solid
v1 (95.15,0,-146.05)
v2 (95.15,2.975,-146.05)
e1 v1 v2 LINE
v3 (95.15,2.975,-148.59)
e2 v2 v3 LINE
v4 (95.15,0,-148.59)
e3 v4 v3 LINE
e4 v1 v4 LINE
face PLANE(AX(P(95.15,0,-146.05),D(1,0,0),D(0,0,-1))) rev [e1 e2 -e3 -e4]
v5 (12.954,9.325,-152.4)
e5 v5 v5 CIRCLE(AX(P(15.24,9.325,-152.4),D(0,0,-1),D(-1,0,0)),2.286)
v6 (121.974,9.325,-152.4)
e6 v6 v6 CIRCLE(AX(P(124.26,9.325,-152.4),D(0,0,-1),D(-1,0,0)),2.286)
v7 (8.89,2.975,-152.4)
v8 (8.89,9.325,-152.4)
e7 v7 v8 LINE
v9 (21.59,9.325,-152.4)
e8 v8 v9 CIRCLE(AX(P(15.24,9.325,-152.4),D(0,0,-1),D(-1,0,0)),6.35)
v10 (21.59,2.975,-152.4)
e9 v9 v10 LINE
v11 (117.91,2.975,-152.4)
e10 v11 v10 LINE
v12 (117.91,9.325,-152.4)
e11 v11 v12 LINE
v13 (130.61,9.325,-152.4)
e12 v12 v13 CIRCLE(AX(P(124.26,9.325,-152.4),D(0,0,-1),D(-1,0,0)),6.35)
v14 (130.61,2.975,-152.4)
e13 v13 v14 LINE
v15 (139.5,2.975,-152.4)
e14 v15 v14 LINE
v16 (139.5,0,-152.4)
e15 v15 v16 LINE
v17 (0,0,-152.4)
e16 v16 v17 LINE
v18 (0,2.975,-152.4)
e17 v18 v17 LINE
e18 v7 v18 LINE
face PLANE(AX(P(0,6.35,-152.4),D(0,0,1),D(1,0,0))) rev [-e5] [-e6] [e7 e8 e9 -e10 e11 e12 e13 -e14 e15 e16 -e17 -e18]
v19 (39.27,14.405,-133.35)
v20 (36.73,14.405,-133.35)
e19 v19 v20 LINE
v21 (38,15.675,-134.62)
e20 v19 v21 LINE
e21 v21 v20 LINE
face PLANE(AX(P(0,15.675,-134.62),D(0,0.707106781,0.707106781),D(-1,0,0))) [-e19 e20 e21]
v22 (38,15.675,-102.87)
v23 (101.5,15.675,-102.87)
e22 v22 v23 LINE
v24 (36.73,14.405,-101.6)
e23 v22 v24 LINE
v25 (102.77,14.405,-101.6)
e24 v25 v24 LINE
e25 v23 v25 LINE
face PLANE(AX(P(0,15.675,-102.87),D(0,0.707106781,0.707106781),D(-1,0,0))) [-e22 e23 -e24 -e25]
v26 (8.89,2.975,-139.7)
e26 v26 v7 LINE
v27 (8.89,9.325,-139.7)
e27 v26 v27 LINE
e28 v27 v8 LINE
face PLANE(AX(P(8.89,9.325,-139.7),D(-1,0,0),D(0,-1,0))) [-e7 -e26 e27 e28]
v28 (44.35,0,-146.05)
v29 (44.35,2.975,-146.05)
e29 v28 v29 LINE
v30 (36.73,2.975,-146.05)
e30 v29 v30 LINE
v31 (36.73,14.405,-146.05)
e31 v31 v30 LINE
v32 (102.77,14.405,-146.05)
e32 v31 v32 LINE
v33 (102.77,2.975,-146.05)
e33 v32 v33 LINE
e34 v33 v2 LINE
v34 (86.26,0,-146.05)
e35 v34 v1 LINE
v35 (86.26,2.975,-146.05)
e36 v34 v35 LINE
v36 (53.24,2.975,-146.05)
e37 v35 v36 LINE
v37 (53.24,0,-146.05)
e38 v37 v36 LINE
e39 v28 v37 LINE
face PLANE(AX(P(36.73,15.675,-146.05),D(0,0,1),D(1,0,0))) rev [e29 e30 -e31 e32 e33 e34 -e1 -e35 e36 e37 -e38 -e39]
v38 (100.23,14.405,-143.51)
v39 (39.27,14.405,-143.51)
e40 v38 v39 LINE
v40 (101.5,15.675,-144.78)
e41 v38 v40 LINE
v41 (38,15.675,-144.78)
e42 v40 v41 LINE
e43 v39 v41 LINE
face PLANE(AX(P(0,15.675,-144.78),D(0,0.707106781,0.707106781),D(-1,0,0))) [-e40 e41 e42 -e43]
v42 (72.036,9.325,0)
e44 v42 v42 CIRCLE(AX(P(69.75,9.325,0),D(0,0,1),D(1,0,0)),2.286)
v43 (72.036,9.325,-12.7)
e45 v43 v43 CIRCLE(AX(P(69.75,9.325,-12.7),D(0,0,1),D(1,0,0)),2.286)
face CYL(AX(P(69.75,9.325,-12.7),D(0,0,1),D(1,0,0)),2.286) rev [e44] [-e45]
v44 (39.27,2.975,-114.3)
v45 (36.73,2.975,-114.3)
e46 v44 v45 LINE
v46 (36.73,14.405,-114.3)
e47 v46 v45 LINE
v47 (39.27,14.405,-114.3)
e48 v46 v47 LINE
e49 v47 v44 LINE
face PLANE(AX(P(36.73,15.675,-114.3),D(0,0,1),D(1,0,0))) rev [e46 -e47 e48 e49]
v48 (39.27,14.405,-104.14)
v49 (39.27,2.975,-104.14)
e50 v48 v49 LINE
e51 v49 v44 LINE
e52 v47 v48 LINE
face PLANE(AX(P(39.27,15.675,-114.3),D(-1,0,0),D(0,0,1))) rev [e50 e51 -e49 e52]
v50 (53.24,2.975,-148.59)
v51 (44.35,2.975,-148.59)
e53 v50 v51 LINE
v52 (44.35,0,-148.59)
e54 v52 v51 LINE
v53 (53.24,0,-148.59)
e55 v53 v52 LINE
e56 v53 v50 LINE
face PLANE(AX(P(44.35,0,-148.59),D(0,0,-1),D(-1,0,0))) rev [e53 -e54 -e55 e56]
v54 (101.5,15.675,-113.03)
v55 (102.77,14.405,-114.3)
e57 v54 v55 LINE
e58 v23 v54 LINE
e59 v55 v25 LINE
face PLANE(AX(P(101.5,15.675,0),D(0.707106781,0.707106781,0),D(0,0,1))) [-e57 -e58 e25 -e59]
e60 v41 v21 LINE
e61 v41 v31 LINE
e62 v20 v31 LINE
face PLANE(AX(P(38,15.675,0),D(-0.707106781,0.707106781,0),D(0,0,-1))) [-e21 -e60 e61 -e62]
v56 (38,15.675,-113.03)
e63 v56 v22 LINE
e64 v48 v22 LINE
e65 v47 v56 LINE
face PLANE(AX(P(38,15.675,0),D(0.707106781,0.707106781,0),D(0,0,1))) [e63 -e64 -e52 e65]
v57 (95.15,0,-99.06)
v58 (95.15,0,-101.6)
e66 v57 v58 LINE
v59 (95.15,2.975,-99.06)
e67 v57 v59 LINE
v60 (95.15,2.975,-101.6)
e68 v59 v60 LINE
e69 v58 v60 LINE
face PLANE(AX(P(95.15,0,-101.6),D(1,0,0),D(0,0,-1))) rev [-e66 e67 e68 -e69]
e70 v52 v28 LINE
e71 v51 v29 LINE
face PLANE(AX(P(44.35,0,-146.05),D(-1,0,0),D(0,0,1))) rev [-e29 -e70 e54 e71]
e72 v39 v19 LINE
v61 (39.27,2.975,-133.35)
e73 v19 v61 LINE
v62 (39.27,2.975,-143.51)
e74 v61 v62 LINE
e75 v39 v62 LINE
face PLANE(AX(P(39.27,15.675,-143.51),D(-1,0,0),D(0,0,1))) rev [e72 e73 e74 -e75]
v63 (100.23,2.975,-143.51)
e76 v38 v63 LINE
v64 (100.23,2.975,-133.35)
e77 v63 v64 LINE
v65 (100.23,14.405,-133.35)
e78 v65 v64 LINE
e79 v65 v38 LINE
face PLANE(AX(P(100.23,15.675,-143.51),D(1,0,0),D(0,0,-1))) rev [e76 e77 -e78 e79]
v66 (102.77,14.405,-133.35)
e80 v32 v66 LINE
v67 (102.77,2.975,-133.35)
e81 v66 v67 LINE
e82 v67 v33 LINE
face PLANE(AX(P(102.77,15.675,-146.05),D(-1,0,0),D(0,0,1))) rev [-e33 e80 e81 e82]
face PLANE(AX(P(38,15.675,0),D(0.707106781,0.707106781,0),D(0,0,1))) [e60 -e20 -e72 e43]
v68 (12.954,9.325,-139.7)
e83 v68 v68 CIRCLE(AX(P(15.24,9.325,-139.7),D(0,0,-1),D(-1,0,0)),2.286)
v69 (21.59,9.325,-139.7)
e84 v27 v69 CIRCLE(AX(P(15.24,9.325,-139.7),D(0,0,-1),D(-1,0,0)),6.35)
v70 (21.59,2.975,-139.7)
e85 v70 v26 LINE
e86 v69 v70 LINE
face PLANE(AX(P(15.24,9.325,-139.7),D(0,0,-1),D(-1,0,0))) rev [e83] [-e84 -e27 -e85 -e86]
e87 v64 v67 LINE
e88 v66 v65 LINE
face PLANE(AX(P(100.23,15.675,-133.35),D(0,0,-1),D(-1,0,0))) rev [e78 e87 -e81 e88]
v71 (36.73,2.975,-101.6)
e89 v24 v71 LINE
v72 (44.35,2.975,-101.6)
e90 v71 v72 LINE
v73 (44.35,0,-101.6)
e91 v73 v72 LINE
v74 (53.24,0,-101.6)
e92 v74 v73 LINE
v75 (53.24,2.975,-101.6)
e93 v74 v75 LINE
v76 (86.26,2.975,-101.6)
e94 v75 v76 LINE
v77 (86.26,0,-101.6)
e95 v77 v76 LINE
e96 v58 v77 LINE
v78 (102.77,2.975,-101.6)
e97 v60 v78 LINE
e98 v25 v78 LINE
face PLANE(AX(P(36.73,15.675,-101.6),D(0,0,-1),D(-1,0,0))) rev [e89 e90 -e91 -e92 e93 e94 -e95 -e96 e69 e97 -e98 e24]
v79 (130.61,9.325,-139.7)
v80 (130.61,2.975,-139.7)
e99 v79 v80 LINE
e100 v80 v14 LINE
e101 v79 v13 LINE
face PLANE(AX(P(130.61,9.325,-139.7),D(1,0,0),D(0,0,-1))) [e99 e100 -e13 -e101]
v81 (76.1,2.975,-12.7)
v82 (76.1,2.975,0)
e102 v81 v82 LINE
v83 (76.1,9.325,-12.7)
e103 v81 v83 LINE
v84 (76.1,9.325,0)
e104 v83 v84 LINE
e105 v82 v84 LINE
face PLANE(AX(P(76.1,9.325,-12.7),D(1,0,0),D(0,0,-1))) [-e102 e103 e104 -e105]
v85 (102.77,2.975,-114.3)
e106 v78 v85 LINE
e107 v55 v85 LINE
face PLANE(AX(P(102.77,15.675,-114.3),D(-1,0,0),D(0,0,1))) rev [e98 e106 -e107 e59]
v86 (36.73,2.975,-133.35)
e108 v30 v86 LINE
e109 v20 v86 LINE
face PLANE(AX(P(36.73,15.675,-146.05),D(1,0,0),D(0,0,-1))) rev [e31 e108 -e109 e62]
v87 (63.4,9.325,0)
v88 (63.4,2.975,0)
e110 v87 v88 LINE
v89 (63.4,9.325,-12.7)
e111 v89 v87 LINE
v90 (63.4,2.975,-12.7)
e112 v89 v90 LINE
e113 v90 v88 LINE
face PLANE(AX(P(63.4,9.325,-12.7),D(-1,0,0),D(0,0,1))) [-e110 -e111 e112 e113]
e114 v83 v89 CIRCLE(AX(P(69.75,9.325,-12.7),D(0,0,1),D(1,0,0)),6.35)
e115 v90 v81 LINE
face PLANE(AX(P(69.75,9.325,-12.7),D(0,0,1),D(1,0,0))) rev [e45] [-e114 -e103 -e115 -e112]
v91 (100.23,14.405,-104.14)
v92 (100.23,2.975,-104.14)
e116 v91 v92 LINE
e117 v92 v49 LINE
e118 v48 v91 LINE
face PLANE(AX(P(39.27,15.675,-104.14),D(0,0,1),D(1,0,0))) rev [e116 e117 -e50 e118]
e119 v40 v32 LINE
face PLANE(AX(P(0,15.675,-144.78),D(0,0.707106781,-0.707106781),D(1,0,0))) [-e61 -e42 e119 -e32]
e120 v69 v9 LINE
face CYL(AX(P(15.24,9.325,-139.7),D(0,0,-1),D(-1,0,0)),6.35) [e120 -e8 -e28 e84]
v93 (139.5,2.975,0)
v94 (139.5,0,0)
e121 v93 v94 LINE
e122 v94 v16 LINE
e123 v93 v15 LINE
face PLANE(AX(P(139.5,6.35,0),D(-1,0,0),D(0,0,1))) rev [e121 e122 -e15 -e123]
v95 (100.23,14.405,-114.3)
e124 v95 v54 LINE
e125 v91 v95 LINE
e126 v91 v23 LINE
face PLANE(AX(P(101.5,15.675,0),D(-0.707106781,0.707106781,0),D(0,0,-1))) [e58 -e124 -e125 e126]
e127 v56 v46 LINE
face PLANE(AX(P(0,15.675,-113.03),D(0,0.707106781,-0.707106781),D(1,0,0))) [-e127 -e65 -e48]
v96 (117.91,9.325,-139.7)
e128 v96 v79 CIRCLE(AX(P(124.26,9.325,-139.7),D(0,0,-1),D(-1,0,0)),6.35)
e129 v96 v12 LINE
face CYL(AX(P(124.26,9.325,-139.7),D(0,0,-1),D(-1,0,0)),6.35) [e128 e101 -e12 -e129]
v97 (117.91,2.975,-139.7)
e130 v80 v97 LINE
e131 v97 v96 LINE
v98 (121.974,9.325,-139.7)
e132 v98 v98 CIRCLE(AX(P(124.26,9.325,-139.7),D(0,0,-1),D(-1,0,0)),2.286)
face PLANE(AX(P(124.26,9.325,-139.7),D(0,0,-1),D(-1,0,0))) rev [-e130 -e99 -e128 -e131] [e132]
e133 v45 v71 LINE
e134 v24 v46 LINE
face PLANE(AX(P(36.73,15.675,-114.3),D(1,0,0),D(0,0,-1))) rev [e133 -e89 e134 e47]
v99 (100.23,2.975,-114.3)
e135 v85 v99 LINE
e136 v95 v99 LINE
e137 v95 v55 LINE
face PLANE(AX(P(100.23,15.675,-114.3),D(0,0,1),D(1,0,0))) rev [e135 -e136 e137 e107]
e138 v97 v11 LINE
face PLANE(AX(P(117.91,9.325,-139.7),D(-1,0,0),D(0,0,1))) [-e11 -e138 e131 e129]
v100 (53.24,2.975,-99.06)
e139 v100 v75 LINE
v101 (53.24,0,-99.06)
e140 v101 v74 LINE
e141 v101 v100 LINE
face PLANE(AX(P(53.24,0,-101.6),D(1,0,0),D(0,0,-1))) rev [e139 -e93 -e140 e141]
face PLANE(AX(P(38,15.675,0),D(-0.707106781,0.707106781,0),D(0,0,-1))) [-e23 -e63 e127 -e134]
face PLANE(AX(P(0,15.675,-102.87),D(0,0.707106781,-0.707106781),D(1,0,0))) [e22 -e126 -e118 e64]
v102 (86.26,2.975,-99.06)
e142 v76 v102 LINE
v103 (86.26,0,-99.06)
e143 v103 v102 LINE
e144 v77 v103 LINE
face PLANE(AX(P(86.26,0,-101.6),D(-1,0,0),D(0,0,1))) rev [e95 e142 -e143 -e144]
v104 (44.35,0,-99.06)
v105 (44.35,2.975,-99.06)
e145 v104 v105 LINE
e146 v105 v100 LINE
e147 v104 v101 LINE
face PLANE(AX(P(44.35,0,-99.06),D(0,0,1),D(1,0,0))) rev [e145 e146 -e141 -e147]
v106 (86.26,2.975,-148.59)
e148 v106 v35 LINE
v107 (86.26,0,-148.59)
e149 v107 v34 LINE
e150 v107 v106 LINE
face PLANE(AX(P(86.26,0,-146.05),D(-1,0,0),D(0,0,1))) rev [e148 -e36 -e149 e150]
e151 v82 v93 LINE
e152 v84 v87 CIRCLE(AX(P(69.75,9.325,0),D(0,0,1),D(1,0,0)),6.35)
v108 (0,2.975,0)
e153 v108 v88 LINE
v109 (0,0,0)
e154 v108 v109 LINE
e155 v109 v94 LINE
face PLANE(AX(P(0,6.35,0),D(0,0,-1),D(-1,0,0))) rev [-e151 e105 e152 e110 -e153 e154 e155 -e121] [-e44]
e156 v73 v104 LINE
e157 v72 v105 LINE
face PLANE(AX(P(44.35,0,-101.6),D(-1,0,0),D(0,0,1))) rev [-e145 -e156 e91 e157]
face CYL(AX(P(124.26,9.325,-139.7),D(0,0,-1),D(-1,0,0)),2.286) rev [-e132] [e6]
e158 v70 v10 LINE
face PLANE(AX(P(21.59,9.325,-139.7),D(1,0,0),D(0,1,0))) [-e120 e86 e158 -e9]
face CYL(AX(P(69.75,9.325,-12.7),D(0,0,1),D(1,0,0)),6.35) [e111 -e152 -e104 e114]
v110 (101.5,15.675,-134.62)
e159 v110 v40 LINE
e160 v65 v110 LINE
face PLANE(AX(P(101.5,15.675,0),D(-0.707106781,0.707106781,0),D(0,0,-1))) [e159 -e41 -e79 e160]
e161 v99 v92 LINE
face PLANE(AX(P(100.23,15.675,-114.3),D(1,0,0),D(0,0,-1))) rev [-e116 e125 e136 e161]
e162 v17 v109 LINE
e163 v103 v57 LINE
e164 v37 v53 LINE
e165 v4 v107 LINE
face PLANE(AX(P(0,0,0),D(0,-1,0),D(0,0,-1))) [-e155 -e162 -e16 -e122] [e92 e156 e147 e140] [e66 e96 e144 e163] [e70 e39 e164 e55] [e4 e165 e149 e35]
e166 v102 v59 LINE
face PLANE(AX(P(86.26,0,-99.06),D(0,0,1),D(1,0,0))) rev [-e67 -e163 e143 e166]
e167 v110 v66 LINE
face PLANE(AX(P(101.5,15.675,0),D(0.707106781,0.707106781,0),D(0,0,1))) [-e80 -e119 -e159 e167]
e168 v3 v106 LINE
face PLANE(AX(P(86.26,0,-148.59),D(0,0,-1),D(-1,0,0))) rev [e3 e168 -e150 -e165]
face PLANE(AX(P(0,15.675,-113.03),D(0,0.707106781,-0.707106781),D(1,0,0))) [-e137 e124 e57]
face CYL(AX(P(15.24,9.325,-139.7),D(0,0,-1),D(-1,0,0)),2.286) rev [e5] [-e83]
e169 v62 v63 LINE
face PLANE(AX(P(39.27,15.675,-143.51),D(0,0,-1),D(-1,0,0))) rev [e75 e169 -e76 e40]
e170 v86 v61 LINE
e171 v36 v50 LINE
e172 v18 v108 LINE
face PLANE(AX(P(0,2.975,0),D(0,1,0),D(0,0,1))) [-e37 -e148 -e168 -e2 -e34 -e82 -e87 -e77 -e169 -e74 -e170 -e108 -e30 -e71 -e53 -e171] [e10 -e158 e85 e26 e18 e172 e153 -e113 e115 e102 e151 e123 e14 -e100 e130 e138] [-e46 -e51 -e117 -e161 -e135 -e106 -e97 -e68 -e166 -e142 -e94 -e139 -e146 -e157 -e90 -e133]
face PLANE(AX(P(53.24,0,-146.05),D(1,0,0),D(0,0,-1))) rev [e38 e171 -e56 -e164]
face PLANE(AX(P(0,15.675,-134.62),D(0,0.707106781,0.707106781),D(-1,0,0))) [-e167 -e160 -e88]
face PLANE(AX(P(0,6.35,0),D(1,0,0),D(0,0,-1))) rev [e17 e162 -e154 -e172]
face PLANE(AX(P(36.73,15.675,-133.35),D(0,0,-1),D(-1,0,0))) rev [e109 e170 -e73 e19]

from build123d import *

# Parameters (mm, degrees)
SKETCH1_W           = 139.5
SKETCH1_H           = 152.4
BOSS_EXTRUDE1_DEPTH = 6.35
SKETCH2_W           = 139.5
SKETCH2_H           = 152.4
CUT_EXTRUDE1_DEPTH  = 3.375
SKETCH3_R           = 2.286
BOSS_EXTRUDE2_DEPTH = 12.7
SKETCH4_R           = 2.286
BOSS_EXTRUDE3_DEPTH = 12.7
BOSS_EXTRUDE4_DEPTH = 12.7
CHAMFER1_SIZE       = 1.27
SKETCH6_W           = 8.89
SKETCH6_H           = 2.54
CUT_EXTRUDE2_DEPTH  = 207.995893689


with BuildPart() as part:
    # Sketch1 → Boss-Extrude1 (new body)
    with BuildSketch(Plane(origin=(0, 0, 0), x_dir=(1, 0, 0), z_dir=(0, 1, 0))):
        with Locations((69.75, 76.2)):
            Rectangle(SKETCH1_W, SKETCH1_H)
    extrude(amount=BOSS_EXTRUDE1_DEPTH)

    # Sketch2 → Cut-Extrude1 (cut)
    with BuildSketch(Plane(origin=(0, 6.35, 0), x_dir=(1, 0, 0), z_dir=(0, 1, 0))):
        with Locations((69.75, 76.2)):
            Rectangle(SKETCH2_W, SKETCH2_H)
    extrude(amount=-CUT_EXTRUDE1_DEPTH, mode=Mode.SUBTRACT)

    # Sketch3 → Boss-Extrude2 (add)
    with BuildSketch(Plane.XY):
        with BuildLine():
            Line((63.4, 9.325), (63.4, 2.975))
            Line((63.4, 2.975), (76.1, 2.975))
            Line((76.1, 2.975), (76.1, 9.325000158))
            ThreePointArc((76.1, 9.325000158), (69.749999921, 15.675000158), (63.4, 9.325))
        make_face()
        with Locations((69.75, 9.325000158)):
            Circle(SKETCH3_R, mode=Mode.SUBTRACT)
    extrude(amount=-BOSS_EXTRUDE2_DEPTH)

    # Sketch4 → Boss-Extrude3 (add)
    # profile 1 of 2: a face of its own
    with BuildSketch(Plane(origin=(0, 0, -152.4), x_dir=(-1, 0, 0), z_dir=(0, 0, -1))):
        with BuildLine():
            Line((-130.61, 9.325), (-130.61, 2.975))
            Line((-130.61, 2.975), (-117.91, 2.975))
            Line((-117.91, 2.975), (-117.91, 9.325))
            ThreePointArc((-117.91, 9.325), (-124.26, 15.675), (-130.61, 9.325))
        make_face()
        with Locations((-124.26, 9.325)):
            Circle(SKETCH4_R, mode=Mode.SUBTRACT)
    # profile 2 of 2: a face of its own
    with BuildSketch(Plane(origin=(0, 0, -152.4), x_dir=(-1, 0, 0), z_dir=(0, 0, -1))):
        with BuildLine():
            Line((-21.59, 9.325), (-21.59, 2.975))
            Line((-21.59, 2.975), (-8.89, 2.975))
            Line((-8.89, 2.975), (-8.89, 9.325))
            ThreePointArc((-8.89, 9.325), (-15.24, 15.675), (-21.59, 9.325))
        make_face()
        with Locations((-15.24, 9.325)):
            Circle(SKETCH4_R, mode=Mode.SUBTRACT)
    extrude(amount=-BOSS_EXTRUDE3_DEPTH)

    # Sketch5 → Boss-Extrude4 (add)
    with BuildSketch(Plane(origin=(0, 2.975, 0), x_dir=(1, 0, 0), z_dir=(0, 1, 0))):
        Polygon((36.73, 146.05), (36.73, 133.35), (39.27, 133.35), (39.27, 143.51), (100.23, 143.51), (100.23, 133.35), (102.77, 133.35), (102.77, 146.05), align=None)
        Polygon((39.27, 104.14), (100.23, 104.14), (100.23, 114.3), (102.77, 114.3), (102.77, 101.6), (36.73, 101.6), (36.73, 114.3), (39.27, 114.3), align=None)
    extrude(amount=BOSS_EXTRUDE4_DEPTH)

    # Chamfer1
    chamfer1_edges = [part.edges().sort_by_distance(p)[0] for p in [
        (100.23, 15.675, -109.22),
        (69.75, 15.675, -104.14),
        (39.27, 15.675, -109.22),
        (38, 15.675, -114.3),
        (36.73, 15.675, -107.95),
        (69.75, 15.675, -101.6),
        (102.77, 15.675, -107.95),
        (101.5, 15.675, -114.3),
        (39.27, 15.675, -138.43),
        (69.75, 15.675, -143.51),
        (100.23, 15.675, -138.43),
        (101.5, 15.675, -133.35),
        (102.77, 15.675, -139.7),
        (69.75, 15.675, -146.05),
        (36.73, 15.675, -139.7),
        (38, 15.675, -133.35),
    ]]
    chamfer(chamfer1_edges, length=CHAMFER1_SIZE - 0.0001)  # a hair under: the kernel refuses the full size

    # Sketch6 → Cut-Extrude2 (cut, through all)
    with BuildSketch(Plane(origin=(0, 2.975, 0), x_dir=(1, 0, 0), z_dir=(0, 1, 0))):
        with Locations((48.795, 147.32)):
            Rectangle(SKETCH6_W, SKETCH6_H)
        with Locations((90.705, 147.32)):
            Rectangle(SKETCH6_W, SKETCH6_H)
        with Locations((48.795, 100.33)):
            Rectangle(SKETCH6_W, SKETCH6_H)
        with Locations((90.705, 100.33)):
            Rectangle(SKETCH6_W, SKETCH6_H)
    extrude(amount=-CUT_EXTRUDE2_DEPTH, mode=Mode.SUBTRACT)


solid = part.part
